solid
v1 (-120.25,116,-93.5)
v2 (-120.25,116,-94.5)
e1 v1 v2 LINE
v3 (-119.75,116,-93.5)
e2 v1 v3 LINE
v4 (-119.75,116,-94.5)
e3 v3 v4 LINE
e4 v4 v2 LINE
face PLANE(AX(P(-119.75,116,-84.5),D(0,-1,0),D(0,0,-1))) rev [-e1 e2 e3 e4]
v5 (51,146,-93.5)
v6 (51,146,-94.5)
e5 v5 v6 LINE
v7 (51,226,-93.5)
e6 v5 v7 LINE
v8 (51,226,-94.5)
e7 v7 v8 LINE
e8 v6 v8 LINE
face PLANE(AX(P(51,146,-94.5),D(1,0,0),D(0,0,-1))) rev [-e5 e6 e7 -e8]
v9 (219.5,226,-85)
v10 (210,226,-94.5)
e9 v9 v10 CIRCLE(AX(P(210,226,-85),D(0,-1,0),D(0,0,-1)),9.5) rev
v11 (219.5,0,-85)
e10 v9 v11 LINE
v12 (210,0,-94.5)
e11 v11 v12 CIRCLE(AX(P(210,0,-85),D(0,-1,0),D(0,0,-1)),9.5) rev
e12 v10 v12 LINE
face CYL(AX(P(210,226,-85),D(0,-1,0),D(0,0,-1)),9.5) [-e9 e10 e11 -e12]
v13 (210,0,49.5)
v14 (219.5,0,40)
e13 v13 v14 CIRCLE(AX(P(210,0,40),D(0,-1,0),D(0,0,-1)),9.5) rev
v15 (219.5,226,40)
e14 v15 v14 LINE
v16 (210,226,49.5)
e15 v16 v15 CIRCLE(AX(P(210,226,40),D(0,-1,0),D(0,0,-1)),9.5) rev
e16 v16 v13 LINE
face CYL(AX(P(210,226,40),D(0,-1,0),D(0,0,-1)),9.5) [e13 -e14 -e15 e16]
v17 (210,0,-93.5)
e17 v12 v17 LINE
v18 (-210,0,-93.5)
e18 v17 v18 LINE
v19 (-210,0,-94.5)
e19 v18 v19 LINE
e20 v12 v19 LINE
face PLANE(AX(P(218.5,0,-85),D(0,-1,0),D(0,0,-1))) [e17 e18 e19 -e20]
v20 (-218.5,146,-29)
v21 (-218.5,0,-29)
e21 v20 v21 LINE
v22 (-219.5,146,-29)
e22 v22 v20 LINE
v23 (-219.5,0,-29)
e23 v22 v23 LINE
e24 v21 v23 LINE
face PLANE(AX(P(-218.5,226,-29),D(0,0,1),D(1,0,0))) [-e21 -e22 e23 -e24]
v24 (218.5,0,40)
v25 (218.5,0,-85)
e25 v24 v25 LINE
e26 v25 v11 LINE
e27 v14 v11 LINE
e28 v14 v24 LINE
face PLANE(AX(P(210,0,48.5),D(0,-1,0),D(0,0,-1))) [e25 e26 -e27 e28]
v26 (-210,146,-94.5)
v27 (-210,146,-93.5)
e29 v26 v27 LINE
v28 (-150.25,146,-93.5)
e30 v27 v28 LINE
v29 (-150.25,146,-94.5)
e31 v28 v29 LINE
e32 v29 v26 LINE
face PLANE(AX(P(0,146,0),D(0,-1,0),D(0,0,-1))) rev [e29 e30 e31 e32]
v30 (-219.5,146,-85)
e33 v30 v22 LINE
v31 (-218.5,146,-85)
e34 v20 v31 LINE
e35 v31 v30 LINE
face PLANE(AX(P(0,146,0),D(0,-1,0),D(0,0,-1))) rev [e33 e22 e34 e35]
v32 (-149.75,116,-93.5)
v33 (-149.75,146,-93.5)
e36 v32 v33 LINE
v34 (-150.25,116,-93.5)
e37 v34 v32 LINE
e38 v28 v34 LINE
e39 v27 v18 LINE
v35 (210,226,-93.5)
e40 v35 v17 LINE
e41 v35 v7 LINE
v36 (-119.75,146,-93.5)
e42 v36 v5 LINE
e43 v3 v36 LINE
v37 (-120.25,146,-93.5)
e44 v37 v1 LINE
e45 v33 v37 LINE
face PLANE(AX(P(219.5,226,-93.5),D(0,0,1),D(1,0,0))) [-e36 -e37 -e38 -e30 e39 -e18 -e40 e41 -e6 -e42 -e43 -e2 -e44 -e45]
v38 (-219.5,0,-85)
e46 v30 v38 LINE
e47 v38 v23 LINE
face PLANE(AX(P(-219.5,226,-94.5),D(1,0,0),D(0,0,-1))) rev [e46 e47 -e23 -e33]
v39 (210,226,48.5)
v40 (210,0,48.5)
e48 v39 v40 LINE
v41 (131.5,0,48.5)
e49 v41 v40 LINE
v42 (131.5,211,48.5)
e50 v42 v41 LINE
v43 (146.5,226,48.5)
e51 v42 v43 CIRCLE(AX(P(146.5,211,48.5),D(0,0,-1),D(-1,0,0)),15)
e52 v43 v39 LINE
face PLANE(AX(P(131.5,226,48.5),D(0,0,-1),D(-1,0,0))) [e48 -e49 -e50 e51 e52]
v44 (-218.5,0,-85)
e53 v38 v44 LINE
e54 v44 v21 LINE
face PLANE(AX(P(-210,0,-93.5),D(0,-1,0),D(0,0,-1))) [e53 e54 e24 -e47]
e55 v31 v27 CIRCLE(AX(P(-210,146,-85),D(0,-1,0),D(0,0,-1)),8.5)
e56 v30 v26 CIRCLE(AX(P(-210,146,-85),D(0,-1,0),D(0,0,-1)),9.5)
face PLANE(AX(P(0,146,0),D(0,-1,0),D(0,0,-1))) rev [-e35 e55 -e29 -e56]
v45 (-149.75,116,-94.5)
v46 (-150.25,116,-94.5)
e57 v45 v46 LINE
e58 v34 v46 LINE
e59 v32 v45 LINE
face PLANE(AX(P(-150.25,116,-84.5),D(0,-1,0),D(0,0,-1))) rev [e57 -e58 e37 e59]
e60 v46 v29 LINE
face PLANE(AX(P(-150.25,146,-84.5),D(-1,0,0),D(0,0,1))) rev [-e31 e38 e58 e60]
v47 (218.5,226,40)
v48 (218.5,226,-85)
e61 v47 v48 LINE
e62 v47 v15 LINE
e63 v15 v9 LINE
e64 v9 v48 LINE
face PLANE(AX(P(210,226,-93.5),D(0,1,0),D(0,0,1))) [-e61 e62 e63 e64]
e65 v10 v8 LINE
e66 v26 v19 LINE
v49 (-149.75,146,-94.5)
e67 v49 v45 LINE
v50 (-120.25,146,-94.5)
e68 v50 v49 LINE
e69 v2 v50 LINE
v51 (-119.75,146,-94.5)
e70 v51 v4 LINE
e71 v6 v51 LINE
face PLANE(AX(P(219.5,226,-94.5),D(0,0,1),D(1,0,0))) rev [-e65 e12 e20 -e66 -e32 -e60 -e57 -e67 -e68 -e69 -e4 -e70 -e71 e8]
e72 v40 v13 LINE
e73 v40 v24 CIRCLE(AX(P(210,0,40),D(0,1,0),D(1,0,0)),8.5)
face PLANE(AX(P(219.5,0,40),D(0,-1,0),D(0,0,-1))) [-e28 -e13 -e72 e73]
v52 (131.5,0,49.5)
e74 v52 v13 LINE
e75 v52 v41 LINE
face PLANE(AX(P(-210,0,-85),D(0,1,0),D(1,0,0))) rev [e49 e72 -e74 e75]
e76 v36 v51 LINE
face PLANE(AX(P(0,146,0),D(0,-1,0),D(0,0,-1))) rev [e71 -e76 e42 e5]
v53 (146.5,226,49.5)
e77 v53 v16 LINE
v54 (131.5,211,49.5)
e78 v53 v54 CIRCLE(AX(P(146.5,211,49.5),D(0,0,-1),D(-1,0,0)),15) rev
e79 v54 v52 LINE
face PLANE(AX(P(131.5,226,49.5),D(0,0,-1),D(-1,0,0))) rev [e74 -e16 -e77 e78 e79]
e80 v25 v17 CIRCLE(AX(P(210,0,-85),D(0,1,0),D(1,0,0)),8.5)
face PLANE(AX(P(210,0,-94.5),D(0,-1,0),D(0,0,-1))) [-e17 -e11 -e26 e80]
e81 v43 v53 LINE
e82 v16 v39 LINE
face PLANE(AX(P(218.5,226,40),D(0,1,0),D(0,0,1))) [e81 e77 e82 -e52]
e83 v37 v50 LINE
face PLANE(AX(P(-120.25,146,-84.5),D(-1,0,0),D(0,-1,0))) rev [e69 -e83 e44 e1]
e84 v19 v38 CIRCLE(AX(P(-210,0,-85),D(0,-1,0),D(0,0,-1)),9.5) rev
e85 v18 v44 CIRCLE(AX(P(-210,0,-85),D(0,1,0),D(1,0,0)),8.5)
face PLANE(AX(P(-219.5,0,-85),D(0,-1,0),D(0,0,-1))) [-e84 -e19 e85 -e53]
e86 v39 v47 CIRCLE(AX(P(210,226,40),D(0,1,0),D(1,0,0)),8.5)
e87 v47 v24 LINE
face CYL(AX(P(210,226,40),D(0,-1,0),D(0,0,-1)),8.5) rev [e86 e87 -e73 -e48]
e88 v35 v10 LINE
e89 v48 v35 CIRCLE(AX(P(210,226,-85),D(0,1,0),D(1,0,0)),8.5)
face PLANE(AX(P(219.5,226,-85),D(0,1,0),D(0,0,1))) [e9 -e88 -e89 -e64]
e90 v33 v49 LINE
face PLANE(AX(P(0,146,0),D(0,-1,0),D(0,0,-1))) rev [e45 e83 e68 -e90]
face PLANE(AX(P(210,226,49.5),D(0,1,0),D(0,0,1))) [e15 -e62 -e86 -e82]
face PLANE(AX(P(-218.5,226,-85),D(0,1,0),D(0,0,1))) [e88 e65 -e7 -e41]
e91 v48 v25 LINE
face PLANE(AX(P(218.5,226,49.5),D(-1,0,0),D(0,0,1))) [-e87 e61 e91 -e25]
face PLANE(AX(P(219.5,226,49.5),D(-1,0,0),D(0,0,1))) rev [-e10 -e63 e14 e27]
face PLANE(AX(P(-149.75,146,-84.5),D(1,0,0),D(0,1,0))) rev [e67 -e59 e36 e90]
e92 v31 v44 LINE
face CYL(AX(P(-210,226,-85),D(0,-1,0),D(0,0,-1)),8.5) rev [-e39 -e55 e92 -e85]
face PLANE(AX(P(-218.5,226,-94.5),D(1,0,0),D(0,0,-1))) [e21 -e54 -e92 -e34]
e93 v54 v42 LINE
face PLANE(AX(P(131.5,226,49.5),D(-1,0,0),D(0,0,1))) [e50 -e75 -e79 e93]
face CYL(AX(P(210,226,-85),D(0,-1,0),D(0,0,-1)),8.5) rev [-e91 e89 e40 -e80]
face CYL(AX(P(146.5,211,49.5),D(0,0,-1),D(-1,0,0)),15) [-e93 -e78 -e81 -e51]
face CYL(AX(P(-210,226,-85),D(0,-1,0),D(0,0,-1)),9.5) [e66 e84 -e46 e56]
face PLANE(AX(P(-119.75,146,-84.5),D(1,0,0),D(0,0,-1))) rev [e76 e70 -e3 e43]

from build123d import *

# Parameters (mm, degrees)
T_LE_DE_BASE_PLI_E1_DEPTH = 226
CONG_1_R                  = 15
ESQUISSE2_W               = 270.5
ESQUISSE2_H               = 65.5
ENL_V_MAT_EXTRU_1_DEPTH   = 80
ESQUISSE6_W               = 0.5
ESQUISSE6_H               = 30
ENL_V_MAT_EXTRU_2_DEPTH   = 10


# Read off the part's stored shape, not the designer's step: Tôle de base pliée1
with BuildPart() as part:
    # Tôle de base pliée1 outline → Tôle de base pliée1 (new body)
    with BuildSketch(Plane(origin=(0, 0, 0), x_dir=(1, 0, 0), z_dir=(0, 1, 0))):
        with BuildLine():
            Line((-219.5, 85), (-219.5, 29))
            Line((-219.5, 29), (-218.5, 29))
            Line((-218.5, 29), (-218.5, 85))
            ThreePointArc((-218.5, 85), (-216.01040764, 91.01040764), (-210, 93.5))
            Line((-210, 93.5), (210, 93.5))
            ThreePointArc((210, 93.5), (216.01040764, 91.01040764), (218.5, 85))
            Line((218.5, 85), (218.5, -40))
            ThreePointArc((218.5, -40), (216.01040764, -46.01040764), (210, -48.5))
            Line((210, -48.5), (131.5, -48.5))
            Line((131.5, -48.5), (131.5, -49.5))
            Line((131.5, -49.5), (210, -49.5))
            ThreePointArc((210, -49.5), (216.717514421, -46.717514421), (219.5, -40))
            Line((219.5, -40), (219.5, 85))
            ThreePointArc((219.5, 85), (216.717514421, 91.717514421), (210, 94.5))
            Line((210, 94.5), (-210, 94.5))
            ThreePointArc((-210, 94.5), (-216.717514421, 91.717514421), (-219.5, 85))
        make_face()
    extrude(amount=T_LE_DE_BASE_PLI_E1_DEPTH)

    # Congé1
    cong_1_edges = [part.edges().sort_by_distance(p)[0] for p in [
        (131.5, 226, 49),
    ]]
    fillet(cong_1_edges, radius=CONG_1_R)

    # Esquisse2 → Enlèv. mat.-Extru.1 (cut)
    with BuildSketch(Plane(origin=(0, 226, 0), x_dir=(1, 0, 0), z_dir=(0, 1, 0))):
        with Locations((-84.25, 61.75)):
            Rectangle(ESQUISSE2_W, ESQUISSE2_H)
    extrude(amount=-ENL_V_MAT_EXTRU_1_DEPTH, mode=Mode.SUBTRACT)

    # Esquisse6 → Enlèv. mat.-Extru.2 (cut)
    with BuildSketch(Plane(origin=(0, 0, -94.5), x_dir=(-1, 0, 0), z_dir=(0, 0, -1))):
        with Locations((120, 131)):
            Rectangle(ESQUISSE6_W, ESQUISSE6_H)
        with Locations((150, 131)):
            Rectangle(ESQUISSE6_W, ESQUISSE6_H)
    extrude(amount=-ENL_V_MAT_EXTRU_2_DEPTH, mode=Mode.SUBTRACT)


solid = part.part
